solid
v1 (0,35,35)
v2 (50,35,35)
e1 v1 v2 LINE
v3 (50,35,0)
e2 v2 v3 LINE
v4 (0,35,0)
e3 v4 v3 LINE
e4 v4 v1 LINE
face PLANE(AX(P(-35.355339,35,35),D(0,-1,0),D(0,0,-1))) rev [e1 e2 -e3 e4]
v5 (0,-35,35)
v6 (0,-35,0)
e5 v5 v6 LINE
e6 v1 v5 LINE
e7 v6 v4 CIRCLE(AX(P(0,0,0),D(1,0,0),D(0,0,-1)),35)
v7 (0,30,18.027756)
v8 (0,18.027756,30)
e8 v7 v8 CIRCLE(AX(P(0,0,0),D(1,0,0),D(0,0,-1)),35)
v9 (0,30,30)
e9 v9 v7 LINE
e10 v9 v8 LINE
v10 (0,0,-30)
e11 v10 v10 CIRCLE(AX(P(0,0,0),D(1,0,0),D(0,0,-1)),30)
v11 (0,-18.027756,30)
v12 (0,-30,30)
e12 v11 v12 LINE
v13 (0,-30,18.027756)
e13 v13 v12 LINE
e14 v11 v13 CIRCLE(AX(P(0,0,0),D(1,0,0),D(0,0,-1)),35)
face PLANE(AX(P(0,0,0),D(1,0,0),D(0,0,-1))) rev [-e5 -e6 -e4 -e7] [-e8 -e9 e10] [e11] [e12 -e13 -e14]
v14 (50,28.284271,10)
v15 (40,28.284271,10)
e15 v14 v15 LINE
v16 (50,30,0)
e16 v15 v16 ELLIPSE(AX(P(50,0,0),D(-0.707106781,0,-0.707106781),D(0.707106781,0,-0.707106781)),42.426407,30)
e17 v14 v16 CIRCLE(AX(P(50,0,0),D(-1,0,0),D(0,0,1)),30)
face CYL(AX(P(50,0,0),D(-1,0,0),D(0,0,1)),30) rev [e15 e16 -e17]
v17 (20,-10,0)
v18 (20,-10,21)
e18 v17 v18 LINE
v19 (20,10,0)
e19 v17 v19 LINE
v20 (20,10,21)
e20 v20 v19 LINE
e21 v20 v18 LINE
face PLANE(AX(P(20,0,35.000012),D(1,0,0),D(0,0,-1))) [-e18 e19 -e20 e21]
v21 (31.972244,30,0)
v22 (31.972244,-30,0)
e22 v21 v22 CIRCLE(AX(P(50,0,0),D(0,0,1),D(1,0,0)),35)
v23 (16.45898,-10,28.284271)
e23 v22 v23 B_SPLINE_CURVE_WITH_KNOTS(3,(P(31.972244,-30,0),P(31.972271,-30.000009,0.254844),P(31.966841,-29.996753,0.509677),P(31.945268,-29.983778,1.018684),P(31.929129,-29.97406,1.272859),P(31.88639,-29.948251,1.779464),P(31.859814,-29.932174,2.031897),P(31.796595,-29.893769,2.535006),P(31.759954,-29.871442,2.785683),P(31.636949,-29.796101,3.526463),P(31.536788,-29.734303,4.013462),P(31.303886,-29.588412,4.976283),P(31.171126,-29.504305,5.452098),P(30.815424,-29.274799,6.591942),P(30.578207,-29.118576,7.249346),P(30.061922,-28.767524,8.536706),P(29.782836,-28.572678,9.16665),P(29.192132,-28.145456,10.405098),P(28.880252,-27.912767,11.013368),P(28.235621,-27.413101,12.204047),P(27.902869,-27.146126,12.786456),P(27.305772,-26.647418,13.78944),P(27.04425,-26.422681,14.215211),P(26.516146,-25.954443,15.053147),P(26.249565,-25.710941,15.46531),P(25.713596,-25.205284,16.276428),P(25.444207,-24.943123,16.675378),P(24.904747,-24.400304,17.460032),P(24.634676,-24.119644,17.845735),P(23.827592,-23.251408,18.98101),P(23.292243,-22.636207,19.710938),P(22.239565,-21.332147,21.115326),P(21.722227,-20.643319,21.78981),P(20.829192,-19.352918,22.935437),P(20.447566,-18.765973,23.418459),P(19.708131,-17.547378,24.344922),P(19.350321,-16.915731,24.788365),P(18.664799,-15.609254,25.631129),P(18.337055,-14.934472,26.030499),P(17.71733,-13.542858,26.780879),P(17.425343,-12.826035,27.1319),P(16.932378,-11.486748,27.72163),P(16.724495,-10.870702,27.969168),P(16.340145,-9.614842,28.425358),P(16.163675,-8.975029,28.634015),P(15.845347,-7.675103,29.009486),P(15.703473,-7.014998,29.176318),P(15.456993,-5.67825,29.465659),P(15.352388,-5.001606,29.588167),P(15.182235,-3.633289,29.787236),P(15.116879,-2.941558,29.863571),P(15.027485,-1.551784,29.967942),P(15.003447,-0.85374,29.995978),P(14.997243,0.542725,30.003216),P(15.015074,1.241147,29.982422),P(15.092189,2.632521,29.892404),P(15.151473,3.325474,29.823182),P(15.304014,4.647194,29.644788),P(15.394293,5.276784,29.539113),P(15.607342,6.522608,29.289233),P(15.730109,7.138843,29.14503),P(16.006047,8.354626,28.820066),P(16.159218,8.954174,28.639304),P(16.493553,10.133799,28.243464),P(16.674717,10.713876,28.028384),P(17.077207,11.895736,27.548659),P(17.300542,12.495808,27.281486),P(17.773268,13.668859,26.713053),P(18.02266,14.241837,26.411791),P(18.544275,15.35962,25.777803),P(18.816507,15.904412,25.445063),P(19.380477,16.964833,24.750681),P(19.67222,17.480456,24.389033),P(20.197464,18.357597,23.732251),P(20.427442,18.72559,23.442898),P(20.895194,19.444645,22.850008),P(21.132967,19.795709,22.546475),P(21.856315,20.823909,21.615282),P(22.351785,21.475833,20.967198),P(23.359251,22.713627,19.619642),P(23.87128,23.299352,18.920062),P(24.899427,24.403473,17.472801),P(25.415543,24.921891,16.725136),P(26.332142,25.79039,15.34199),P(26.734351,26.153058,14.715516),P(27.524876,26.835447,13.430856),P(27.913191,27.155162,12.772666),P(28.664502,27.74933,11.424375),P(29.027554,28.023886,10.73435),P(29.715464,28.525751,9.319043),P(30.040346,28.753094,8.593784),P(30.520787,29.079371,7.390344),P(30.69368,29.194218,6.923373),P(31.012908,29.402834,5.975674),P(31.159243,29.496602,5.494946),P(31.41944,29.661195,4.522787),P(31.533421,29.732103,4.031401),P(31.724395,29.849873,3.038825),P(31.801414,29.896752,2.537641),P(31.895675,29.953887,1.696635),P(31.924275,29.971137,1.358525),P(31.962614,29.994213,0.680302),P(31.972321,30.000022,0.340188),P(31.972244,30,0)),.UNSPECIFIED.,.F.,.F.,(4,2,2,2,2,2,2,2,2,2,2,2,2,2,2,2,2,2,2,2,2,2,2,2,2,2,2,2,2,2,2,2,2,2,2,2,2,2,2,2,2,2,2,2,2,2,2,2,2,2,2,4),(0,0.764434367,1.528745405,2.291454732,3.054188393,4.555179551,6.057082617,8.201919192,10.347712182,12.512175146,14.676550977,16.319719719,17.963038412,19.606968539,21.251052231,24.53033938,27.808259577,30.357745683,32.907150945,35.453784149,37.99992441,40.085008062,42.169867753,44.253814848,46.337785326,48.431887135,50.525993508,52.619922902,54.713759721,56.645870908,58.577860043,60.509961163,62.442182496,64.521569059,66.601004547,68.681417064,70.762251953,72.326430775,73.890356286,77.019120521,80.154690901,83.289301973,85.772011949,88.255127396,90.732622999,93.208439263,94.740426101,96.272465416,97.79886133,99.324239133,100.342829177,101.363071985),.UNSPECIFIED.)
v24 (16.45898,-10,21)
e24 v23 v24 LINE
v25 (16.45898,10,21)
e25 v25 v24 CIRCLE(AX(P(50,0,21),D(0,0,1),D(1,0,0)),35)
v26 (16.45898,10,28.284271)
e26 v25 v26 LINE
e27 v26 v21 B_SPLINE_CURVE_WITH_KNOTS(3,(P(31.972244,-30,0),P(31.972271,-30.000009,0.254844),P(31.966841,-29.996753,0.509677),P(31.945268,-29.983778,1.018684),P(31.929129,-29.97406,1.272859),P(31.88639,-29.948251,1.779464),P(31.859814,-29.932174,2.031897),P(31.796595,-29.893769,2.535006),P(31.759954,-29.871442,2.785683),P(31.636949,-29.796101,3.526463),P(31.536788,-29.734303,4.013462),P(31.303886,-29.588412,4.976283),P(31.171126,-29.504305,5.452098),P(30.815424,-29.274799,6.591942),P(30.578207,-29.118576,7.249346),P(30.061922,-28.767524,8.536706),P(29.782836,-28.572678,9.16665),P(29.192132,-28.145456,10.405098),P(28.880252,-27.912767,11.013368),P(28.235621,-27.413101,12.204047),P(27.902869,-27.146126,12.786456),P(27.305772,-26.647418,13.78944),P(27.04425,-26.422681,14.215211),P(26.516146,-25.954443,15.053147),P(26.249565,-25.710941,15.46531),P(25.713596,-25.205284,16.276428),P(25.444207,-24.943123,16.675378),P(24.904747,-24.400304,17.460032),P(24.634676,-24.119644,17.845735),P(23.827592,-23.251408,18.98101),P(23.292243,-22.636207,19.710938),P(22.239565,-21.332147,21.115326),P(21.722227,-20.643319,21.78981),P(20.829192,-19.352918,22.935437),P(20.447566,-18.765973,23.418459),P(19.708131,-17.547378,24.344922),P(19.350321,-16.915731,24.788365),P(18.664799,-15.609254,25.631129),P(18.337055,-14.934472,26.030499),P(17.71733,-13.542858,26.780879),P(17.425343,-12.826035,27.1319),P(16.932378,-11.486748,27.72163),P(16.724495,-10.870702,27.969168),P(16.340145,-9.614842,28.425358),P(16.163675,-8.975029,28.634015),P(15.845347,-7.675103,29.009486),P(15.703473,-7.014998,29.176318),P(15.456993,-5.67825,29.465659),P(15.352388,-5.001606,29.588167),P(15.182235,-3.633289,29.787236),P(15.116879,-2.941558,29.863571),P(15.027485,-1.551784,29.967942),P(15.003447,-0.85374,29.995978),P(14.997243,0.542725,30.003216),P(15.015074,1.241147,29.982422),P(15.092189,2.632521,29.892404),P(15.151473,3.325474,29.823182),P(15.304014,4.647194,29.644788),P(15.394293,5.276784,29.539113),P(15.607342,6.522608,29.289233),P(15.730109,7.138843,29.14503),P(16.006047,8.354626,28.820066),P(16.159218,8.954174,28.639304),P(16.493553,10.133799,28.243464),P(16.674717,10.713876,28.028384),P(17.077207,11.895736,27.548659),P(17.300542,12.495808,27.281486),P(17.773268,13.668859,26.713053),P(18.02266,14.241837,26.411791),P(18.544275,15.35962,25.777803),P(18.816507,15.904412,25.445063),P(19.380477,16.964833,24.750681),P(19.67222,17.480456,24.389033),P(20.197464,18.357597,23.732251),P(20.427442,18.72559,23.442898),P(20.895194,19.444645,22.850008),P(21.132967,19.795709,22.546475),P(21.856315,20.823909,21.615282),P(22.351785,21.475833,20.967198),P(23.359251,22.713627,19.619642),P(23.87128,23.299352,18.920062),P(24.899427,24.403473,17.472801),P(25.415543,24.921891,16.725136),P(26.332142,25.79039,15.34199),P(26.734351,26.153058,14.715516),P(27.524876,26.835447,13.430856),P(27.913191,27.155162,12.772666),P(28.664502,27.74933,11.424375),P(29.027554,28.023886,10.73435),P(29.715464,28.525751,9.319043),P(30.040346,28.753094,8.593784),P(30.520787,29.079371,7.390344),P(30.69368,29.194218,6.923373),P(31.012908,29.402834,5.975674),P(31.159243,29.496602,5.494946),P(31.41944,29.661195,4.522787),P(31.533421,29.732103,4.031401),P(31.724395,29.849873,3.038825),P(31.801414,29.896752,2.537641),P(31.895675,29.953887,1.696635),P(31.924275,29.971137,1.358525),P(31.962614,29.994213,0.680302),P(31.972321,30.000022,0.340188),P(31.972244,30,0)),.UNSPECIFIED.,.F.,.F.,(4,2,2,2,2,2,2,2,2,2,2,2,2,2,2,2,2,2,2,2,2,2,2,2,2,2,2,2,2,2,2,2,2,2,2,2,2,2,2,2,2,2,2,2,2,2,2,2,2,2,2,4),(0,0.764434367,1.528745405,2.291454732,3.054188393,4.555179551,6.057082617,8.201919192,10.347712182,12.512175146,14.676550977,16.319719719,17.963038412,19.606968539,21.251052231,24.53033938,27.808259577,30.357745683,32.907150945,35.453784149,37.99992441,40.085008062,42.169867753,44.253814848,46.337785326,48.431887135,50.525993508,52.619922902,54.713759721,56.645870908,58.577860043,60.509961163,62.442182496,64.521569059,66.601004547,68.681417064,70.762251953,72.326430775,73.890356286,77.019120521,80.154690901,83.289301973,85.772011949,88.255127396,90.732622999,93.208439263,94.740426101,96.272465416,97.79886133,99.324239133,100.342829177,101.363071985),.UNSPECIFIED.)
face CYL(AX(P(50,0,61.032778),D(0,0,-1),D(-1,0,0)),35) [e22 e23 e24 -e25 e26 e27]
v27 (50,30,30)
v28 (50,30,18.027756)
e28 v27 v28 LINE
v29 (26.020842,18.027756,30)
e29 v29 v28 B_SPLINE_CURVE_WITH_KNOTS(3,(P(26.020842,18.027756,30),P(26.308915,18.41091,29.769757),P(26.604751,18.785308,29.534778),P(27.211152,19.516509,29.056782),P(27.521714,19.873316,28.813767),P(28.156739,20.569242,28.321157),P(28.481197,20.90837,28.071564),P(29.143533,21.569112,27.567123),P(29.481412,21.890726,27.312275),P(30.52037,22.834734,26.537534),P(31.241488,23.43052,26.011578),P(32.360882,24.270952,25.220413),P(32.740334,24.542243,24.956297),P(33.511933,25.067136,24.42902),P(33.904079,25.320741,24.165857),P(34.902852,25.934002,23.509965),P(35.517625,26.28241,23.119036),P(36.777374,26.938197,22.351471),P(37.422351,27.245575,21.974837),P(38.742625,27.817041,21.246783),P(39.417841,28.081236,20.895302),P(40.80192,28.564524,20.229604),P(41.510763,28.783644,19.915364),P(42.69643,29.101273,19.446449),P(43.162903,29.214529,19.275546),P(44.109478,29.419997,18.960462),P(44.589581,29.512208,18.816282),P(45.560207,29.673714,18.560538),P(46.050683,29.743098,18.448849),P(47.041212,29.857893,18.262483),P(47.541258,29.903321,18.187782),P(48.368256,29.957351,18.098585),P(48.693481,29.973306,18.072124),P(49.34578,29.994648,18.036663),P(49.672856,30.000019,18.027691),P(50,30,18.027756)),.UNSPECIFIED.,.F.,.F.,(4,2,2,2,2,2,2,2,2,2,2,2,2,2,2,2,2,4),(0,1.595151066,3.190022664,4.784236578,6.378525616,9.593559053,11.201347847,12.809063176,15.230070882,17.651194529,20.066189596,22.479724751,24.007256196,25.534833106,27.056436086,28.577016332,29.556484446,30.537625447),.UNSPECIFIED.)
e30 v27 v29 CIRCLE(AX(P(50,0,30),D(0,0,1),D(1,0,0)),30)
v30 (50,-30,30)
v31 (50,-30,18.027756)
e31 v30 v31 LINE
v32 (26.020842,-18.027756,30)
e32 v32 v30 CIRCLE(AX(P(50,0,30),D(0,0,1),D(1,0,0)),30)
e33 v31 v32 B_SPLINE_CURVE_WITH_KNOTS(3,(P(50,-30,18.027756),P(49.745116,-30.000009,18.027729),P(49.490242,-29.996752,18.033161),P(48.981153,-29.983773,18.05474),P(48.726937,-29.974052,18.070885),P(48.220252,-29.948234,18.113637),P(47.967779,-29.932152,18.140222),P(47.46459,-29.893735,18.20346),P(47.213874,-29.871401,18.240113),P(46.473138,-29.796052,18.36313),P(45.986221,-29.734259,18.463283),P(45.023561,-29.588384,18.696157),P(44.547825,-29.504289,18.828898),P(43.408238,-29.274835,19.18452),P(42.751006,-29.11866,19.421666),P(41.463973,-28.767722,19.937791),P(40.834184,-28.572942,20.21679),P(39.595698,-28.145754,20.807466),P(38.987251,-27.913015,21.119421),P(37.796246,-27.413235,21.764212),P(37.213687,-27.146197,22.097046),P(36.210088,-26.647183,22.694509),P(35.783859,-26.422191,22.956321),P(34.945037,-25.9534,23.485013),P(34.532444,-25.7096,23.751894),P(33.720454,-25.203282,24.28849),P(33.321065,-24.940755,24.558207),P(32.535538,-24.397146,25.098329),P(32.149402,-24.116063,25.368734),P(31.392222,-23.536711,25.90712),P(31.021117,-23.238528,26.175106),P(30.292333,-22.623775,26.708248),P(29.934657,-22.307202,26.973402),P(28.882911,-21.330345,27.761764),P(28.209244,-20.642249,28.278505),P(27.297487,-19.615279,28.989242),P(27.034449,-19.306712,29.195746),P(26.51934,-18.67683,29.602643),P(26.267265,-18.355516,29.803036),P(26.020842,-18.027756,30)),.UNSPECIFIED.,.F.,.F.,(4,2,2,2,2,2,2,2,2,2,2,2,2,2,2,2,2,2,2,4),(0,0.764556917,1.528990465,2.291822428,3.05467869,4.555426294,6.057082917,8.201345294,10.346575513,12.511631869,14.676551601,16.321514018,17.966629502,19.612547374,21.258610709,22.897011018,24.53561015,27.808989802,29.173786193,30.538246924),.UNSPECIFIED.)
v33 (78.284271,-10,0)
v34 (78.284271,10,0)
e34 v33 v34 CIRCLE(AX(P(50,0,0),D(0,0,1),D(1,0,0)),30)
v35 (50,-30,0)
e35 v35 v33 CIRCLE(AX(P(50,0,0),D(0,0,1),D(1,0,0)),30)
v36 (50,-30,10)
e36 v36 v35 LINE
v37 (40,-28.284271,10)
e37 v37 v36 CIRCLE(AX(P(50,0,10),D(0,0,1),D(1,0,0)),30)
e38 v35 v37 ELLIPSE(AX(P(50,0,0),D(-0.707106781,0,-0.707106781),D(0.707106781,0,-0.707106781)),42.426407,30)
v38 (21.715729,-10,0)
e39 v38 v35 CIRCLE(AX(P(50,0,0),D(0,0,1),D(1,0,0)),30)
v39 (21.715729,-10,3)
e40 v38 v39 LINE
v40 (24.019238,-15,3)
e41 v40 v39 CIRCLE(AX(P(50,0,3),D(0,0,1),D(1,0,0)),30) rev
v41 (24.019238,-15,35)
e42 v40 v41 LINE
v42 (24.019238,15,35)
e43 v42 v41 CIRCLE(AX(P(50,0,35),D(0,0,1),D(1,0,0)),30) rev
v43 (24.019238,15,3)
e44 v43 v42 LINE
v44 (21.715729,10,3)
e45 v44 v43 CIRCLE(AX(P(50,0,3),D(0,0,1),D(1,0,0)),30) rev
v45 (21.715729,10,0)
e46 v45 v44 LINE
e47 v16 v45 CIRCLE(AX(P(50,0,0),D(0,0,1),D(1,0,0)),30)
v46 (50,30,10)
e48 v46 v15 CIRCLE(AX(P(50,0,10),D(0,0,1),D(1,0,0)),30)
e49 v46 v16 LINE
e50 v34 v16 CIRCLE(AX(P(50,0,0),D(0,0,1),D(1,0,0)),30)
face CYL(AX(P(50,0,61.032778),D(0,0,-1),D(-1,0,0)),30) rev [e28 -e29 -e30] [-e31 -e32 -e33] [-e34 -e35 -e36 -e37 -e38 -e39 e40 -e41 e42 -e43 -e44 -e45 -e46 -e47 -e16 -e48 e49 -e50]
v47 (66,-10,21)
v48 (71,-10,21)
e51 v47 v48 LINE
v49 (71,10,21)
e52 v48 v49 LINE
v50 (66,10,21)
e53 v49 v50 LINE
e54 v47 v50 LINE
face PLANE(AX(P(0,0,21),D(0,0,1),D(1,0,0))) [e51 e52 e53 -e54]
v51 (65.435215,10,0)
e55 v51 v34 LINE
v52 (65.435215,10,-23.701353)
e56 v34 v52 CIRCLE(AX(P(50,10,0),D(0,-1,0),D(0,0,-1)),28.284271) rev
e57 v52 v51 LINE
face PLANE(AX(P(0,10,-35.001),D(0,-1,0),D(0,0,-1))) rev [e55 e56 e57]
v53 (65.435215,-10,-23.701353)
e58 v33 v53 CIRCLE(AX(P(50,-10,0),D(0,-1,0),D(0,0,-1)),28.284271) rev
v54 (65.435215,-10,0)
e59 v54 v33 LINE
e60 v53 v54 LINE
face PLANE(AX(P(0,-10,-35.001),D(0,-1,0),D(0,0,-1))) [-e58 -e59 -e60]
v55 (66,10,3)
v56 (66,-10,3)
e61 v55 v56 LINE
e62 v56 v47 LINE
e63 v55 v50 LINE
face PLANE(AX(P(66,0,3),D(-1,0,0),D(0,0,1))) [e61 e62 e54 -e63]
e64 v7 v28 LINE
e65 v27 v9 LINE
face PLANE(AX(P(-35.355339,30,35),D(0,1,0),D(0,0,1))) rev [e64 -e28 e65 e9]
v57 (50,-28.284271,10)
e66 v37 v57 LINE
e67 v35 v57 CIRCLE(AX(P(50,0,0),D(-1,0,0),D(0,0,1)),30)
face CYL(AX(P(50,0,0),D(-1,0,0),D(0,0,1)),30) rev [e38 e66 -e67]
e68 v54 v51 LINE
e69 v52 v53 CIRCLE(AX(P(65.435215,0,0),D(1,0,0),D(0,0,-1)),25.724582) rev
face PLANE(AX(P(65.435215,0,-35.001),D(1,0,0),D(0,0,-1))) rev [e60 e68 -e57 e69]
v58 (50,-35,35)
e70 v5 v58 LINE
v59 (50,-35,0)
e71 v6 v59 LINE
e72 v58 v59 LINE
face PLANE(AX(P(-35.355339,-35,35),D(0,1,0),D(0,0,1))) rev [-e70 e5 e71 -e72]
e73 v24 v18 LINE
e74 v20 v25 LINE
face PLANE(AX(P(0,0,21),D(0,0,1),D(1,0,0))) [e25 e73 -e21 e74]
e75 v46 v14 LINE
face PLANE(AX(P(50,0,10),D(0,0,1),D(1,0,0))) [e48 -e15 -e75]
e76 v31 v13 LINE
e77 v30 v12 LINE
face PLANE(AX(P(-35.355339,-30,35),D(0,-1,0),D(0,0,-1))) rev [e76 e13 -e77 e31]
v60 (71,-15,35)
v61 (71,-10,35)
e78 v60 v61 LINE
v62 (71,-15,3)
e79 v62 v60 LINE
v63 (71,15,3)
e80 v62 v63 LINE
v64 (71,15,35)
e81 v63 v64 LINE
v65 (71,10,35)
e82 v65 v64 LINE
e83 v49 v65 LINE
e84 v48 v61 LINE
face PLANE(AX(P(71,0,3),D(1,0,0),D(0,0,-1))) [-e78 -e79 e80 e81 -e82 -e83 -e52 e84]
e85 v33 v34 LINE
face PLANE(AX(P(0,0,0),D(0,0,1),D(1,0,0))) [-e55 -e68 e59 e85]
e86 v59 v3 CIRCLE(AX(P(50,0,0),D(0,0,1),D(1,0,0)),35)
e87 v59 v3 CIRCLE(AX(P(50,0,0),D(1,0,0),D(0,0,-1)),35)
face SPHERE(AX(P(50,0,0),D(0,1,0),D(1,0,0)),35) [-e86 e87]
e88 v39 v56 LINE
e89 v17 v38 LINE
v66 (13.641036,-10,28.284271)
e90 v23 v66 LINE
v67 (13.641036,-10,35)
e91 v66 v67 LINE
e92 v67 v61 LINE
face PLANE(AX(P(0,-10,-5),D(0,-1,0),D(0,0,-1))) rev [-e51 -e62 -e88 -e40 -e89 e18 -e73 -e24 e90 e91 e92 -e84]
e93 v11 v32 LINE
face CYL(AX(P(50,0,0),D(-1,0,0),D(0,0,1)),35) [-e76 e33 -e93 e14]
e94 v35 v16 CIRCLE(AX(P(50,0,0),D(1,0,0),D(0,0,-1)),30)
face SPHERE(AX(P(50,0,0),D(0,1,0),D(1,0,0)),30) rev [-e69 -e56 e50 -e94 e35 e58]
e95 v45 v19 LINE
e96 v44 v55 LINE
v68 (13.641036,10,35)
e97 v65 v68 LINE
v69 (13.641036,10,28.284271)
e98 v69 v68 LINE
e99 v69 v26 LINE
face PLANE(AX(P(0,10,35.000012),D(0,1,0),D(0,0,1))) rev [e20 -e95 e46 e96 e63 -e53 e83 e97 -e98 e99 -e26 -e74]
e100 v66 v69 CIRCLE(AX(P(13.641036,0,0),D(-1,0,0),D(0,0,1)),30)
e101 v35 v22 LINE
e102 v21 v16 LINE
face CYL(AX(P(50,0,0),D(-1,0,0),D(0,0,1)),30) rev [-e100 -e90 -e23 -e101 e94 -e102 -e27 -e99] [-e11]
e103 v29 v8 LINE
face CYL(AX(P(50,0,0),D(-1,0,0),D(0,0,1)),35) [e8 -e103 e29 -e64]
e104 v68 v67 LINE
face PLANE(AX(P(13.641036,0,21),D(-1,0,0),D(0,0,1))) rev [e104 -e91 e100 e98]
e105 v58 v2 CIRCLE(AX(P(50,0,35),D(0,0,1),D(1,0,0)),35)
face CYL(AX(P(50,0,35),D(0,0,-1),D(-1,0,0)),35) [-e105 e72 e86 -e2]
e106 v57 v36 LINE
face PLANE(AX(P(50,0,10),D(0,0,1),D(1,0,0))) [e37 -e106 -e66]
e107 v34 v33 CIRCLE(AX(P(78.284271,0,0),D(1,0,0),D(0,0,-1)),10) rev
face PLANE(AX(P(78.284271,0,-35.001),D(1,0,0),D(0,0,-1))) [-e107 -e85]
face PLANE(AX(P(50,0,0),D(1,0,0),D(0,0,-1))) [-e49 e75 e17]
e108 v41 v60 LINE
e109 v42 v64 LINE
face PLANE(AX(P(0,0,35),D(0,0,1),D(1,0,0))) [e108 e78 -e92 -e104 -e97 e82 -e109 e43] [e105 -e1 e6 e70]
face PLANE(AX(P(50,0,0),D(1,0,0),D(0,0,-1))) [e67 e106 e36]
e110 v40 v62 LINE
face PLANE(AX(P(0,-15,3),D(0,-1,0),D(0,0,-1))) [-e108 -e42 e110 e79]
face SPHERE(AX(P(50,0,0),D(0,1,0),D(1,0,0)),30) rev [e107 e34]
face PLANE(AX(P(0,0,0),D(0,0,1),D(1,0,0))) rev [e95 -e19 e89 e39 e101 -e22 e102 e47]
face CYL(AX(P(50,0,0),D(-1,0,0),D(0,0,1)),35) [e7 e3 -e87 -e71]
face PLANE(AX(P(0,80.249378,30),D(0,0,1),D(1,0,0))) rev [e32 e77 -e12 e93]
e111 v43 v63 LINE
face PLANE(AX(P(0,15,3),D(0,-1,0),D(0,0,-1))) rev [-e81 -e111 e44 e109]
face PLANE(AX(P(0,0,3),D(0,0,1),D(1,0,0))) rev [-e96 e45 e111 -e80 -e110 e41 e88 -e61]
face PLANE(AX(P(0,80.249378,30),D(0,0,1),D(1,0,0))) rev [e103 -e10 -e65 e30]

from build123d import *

# Parameters (mm, degrees)
SKETCH3_R                = 35
SKETCH3_R_2              = 30
BOSS_EXTRUDE1_DEPTH      = 50
BOSS_EXTRUDE2_START      = -5
SKETCH4_R                = 30
BOSS_EXTRUDE2_DEPTH      = 5
REVOLVE1_ANGLE           = 90
SKETCH8_R                = 30
CUT_EXTRUDE2_DEPTH       = 5
BOSS_EXTRUDE4_REACH      = 100.362
BOSS_EXTRUDE4_END_RADIUS = 30
BOSS_EXTRUDE5_REACH      = 100.362
BOSS_EXTRUDE18_DEPTH     = 35
SKETCH13_W               = 35
SKETCH13_H               = 5
BOSS_EXTRUDE19_DEPTH     = 50
BOSS_EXTRUDE20_REACH     = 114.583
SKETCH14_W               = 50
SKETCH14_H               = 5
CUT_EXTRUDE4_START       = -25
SKETCH15_R               = 30
CUT_EXTRUDE4_DEPTH       = 25
CUT_EXTRUDE6_DEPTH       = 116.542200083
CUT_EXTRUDE6_DEPTH_BACK  = 40
BOSS_EXTRUDE21_START     = -32
BOSS_EXTRUDE21_DEPTH     = 32
SKETCH20_W               = 6.358964111
SKETCH20_H               = 20
SKETCH20_W_2             = 46
SKETCH20_W_3             = 5
CUT_EXTRUDE7_DEPTH       = 14


# Read off the part's stored shape, not the designer's step: Shell1
with BuildPart() as part:
    # Sketch3 → Boss-Extrude1 (new body)
    with BuildSketch(Plane(origin=(0, 0, 0), x_dir=(0, 0, -1), z_dir=(1, 0, 0))):
        Circle(SKETCH3_R)
        Circle(SKETCH3_R_2, mode=Mode.SUBTRACT)
    extrude(amount=BOSS_EXTRUDE1_DEPTH)

    # Sketch4 → Boss-Extrude2 (add)
    with BuildSketch(Plane(origin=(50, 0, 0), x_dir=(0, 0, -1), z_dir=(1, 0, 0)).offset(BOSS_EXTRUDE2_START)):
        Circle(SKETCH4_R)
    extrude(amount=BOSS_EXTRUDE2_DEPTH)

    # Sketch5 → Revolve1 (revolve)
    with BuildSketch(Plane(origin=(50, 0, 0), x_dir=(0, 0, -1), z_dir=(1, 0, 0))):
        with BuildLine():
            Line((0, -35), (0, 35))
            ThreePointArc((0, 35), (35, 0), (0, -35))
        make_face()
    revolve(axis=Axis((50, -35, 0), (0, -1, 0)), revolution_arc=REVOLVE1_ANGLE)

    # Shell1 outline → Shell1 (revolve, cut)
    with BuildSketch(Plane.YX):
        with BuildLine():
            Line((0, 80), (0, 50))
            Line((0, 50), (30, 50))
            ThreePointArc((30, 50), (21.213203436, 71.213203436), (0, 80))
        make_face()
    revolve(axis=Axis((0, 0, 0), (1, 0, 0)), mode=Mode.SUBTRACT)

    # Sketch8 → Cut-Extrude2 (cut)
    with BuildSketch(Plane.ZY.offset(-45)):
        with Locations(Location((0, 0, 0), (0, 0, 90))):
            Circle(SKETCH8_R)
    extrude(amount=-CUT_EXTRUDE2_DEPTH, mode=Mode.SUBTRACT)

    # Boss-Extrude4: up to this sphere (the profile starts inside it)
    boss_extrude4_end = Location((50, 0, 0)) * Sphere(BOSS_EXTRUDE4_END_RADIUS, mode=Mode.PRIVATE)
    # Sketch7 → Boss-Extrude4 (add, up to the surface)
    with BuildSketch(Plane.XY, mode=Mode.PRIVATE) as boss_extrude4_sk1:
        Polygon((65.435214922, 10), (65.435214922, 0), (65.435214922, -10), (78.284271247, -10), (78.284271247, 10), align=None)
    boss_extrude4_tool1 = extrude(boss_extrude4_sk1.sketch, amount=-BOSS_EXTRUDE4_REACH, mode=Mode.PRIVATE) & boss_extrude4_end
    add(boss_extrude4_tool1.solids().sort_by_distance((71.859743, 0, 0))[0])

    # Sketch10 → Boss-Extrude5 (add, up to next)
    with BuildSketch(Plane.XY, mode=Mode.PRIVATE) as boss_extrude5_sk1:
        with BuildLine():
            ThreePointArc((50, 35), (15, 0), (50, -35))
            Line((50, -35), (50, -30))
            ThreePointArc((50, -30), (20, 0), (50, 30))
            Line((50, 30), (50, 35))
        make_face()
    boss_extrude5_tool1 = extrude(boss_extrude5_sk1.sketch, amount=BOSS_EXTRUDE5_REACH, mode=Mode.PRIVATE) - part.part
    add(boss_extrude5_tool1.solids().sort_by_distance((49.217376, 32.5, 0))[0])

    # Sketch12 → Boss-Extrude18 (add)
    with BuildSketch(Plane.XY):
        with BuildLine():
            ThreePointArc((78.284271247, 10), (80, 0), (78.284271247, -10))
            ThreePointArc((78.284271247, -10), (67.320508076, -24.494897428), (50, -30))
            Line((50, -30), (50, -35))
            ThreePointArc((50, -35), (85, 0), (50, 35))
            Line((50, 35), (50, 30))
            ThreePointArc((50, 30), (67.320508076, 24.494897428), (78.284271247, 10))
        make_face()
    extrude(amount=BOSS_EXTRUDE18_DEPTH)

    # Sketch13 → Boss-Extrude19 (add)
    with BuildSketch(Plane.ZY.offset(-50)):
        with Locations((17.5, -32.5)):
            Rectangle(SKETCH13_W, SKETCH13_H)
        with Locations((17.5, 32.5)):
            Rectangle(SKETCH13_W, SKETCH13_H)
    extrude(amount=BOSS_EXTRUDE19_DEPTH)

    # Boss-Extrude20: up to this face of the body (flat: up to its plane)
    boss_extrude20_end = Plane(part.part.faces().sort_by_distance((25, 30, 26.513878189))[0])
    # Sketch14 → Boss-Extrude20 (add, up to the picked face)
    with BuildSketch(Plane(origin=(0, -30, 0), x_dir=(1, 0, 0), z_dir=(0, 1, 0)), mode=Mode.PRIVATE) as boss_extrude20_sk1:
        with Locations((25, -32.5)):
            Rectangle(SKETCH14_W, SKETCH14_H)
    boss_extrude20_tool1 = split(extrude(boss_extrude20_sk1.sketch, amount=BOSS_EXTRUDE20_REACH, mode=Mode.PRIVATE), bisect_by=boss_extrude20_end, keep=Keep.BOTH, mode=Mode.PRIVATE)
    add(boss_extrude20_tool1.solids().sort_by(Axis((25, -30, 32.5), (0, 1, 0)))[0])

    # Sketch15 → Cut-Extrude4 (cut)
    with BuildSketch(Plane.XY.offset(35).offset(CUT_EXTRUDE4_START)):
        with Locations(Location((50, 0, 0), (0, 0, 109.471220634))):
            Circle(SKETCH15_R)
    extrude(amount=CUT_EXTRUDE4_DEPTH, mode=Mode.SUBTRACT)

    # Sketch16 → Cut-Extrude6 (cut, two sides: drawn at the far end of the back side and taken through both)
    with BuildSketch(Plane.XY.offset(35).offset(-CUT_EXTRUDE6_DEPTH_BACK)):
        with BuildLine():
            Line((21.715728753, 10), (20, 10))
            Line((20, 10), (20, 0))
            ThreePointArc((20, 0), (20.43204321, 5.073059362), (21.715728753, 10))
        make_face()
        with BuildLine():
            ThreePointArc((21.715728753, -10), (20.43204321, -5.073059362), (20, 0))
            Line((20, 0), (20, -10))
            Line((20, -10), (21.715728753, -10))
        make_face()
    extrude(amount=CUT_EXTRUDE6_DEPTH + CUT_EXTRUDE6_DEPTH_BACK, mode=Mode.SUBTRACT)

    # Sketch16<17> → Boss-Extrude21 (add)
    with BuildSketch(Plane.XY.offset(35).offset(BOSS_EXTRUDE21_START)):
        with BuildLine():
            ThreePointArc((24.019237886, 15), (22.752551286, 12.552949398), (21.715728753, 10))
            Line((21.715728753, 10), (66, 10))
            Line((66, 10), (66, -10))
            Line((66, -10), (21.715728753, -10))
            ThreePointArc((21.715728753, -10), (22.752551286, -12.552949398), (24.019237886, -15))
            Line((24.019237886, -15), (71, -15))
            Line((71, -15), (71, 15))
            Line((71, 15), (24.019237886, 15))
        make_face()
    extrude(amount=BOSS_EXTRUDE21_DEPTH)

    # Sketch20 → Cut-Extrude7 (cut)
    with BuildSketch(Plane.XY.offset(35)):
        with Locations((16.820517945, 0)):
            Rectangle(SKETCH20_W, SKETCH20_H)
        with Locations((43, 0)):
            Rectangle(SKETCH20_W_2, SKETCH20_H)
        with Locations((68.5, 0)):
            Rectangle(SKETCH20_W_3, SKETCH20_H)
    extrude(amount=-CUT_EXTRUDE7_DEPTH, mode=Mode.SUBTRACT)


solid = part.part
